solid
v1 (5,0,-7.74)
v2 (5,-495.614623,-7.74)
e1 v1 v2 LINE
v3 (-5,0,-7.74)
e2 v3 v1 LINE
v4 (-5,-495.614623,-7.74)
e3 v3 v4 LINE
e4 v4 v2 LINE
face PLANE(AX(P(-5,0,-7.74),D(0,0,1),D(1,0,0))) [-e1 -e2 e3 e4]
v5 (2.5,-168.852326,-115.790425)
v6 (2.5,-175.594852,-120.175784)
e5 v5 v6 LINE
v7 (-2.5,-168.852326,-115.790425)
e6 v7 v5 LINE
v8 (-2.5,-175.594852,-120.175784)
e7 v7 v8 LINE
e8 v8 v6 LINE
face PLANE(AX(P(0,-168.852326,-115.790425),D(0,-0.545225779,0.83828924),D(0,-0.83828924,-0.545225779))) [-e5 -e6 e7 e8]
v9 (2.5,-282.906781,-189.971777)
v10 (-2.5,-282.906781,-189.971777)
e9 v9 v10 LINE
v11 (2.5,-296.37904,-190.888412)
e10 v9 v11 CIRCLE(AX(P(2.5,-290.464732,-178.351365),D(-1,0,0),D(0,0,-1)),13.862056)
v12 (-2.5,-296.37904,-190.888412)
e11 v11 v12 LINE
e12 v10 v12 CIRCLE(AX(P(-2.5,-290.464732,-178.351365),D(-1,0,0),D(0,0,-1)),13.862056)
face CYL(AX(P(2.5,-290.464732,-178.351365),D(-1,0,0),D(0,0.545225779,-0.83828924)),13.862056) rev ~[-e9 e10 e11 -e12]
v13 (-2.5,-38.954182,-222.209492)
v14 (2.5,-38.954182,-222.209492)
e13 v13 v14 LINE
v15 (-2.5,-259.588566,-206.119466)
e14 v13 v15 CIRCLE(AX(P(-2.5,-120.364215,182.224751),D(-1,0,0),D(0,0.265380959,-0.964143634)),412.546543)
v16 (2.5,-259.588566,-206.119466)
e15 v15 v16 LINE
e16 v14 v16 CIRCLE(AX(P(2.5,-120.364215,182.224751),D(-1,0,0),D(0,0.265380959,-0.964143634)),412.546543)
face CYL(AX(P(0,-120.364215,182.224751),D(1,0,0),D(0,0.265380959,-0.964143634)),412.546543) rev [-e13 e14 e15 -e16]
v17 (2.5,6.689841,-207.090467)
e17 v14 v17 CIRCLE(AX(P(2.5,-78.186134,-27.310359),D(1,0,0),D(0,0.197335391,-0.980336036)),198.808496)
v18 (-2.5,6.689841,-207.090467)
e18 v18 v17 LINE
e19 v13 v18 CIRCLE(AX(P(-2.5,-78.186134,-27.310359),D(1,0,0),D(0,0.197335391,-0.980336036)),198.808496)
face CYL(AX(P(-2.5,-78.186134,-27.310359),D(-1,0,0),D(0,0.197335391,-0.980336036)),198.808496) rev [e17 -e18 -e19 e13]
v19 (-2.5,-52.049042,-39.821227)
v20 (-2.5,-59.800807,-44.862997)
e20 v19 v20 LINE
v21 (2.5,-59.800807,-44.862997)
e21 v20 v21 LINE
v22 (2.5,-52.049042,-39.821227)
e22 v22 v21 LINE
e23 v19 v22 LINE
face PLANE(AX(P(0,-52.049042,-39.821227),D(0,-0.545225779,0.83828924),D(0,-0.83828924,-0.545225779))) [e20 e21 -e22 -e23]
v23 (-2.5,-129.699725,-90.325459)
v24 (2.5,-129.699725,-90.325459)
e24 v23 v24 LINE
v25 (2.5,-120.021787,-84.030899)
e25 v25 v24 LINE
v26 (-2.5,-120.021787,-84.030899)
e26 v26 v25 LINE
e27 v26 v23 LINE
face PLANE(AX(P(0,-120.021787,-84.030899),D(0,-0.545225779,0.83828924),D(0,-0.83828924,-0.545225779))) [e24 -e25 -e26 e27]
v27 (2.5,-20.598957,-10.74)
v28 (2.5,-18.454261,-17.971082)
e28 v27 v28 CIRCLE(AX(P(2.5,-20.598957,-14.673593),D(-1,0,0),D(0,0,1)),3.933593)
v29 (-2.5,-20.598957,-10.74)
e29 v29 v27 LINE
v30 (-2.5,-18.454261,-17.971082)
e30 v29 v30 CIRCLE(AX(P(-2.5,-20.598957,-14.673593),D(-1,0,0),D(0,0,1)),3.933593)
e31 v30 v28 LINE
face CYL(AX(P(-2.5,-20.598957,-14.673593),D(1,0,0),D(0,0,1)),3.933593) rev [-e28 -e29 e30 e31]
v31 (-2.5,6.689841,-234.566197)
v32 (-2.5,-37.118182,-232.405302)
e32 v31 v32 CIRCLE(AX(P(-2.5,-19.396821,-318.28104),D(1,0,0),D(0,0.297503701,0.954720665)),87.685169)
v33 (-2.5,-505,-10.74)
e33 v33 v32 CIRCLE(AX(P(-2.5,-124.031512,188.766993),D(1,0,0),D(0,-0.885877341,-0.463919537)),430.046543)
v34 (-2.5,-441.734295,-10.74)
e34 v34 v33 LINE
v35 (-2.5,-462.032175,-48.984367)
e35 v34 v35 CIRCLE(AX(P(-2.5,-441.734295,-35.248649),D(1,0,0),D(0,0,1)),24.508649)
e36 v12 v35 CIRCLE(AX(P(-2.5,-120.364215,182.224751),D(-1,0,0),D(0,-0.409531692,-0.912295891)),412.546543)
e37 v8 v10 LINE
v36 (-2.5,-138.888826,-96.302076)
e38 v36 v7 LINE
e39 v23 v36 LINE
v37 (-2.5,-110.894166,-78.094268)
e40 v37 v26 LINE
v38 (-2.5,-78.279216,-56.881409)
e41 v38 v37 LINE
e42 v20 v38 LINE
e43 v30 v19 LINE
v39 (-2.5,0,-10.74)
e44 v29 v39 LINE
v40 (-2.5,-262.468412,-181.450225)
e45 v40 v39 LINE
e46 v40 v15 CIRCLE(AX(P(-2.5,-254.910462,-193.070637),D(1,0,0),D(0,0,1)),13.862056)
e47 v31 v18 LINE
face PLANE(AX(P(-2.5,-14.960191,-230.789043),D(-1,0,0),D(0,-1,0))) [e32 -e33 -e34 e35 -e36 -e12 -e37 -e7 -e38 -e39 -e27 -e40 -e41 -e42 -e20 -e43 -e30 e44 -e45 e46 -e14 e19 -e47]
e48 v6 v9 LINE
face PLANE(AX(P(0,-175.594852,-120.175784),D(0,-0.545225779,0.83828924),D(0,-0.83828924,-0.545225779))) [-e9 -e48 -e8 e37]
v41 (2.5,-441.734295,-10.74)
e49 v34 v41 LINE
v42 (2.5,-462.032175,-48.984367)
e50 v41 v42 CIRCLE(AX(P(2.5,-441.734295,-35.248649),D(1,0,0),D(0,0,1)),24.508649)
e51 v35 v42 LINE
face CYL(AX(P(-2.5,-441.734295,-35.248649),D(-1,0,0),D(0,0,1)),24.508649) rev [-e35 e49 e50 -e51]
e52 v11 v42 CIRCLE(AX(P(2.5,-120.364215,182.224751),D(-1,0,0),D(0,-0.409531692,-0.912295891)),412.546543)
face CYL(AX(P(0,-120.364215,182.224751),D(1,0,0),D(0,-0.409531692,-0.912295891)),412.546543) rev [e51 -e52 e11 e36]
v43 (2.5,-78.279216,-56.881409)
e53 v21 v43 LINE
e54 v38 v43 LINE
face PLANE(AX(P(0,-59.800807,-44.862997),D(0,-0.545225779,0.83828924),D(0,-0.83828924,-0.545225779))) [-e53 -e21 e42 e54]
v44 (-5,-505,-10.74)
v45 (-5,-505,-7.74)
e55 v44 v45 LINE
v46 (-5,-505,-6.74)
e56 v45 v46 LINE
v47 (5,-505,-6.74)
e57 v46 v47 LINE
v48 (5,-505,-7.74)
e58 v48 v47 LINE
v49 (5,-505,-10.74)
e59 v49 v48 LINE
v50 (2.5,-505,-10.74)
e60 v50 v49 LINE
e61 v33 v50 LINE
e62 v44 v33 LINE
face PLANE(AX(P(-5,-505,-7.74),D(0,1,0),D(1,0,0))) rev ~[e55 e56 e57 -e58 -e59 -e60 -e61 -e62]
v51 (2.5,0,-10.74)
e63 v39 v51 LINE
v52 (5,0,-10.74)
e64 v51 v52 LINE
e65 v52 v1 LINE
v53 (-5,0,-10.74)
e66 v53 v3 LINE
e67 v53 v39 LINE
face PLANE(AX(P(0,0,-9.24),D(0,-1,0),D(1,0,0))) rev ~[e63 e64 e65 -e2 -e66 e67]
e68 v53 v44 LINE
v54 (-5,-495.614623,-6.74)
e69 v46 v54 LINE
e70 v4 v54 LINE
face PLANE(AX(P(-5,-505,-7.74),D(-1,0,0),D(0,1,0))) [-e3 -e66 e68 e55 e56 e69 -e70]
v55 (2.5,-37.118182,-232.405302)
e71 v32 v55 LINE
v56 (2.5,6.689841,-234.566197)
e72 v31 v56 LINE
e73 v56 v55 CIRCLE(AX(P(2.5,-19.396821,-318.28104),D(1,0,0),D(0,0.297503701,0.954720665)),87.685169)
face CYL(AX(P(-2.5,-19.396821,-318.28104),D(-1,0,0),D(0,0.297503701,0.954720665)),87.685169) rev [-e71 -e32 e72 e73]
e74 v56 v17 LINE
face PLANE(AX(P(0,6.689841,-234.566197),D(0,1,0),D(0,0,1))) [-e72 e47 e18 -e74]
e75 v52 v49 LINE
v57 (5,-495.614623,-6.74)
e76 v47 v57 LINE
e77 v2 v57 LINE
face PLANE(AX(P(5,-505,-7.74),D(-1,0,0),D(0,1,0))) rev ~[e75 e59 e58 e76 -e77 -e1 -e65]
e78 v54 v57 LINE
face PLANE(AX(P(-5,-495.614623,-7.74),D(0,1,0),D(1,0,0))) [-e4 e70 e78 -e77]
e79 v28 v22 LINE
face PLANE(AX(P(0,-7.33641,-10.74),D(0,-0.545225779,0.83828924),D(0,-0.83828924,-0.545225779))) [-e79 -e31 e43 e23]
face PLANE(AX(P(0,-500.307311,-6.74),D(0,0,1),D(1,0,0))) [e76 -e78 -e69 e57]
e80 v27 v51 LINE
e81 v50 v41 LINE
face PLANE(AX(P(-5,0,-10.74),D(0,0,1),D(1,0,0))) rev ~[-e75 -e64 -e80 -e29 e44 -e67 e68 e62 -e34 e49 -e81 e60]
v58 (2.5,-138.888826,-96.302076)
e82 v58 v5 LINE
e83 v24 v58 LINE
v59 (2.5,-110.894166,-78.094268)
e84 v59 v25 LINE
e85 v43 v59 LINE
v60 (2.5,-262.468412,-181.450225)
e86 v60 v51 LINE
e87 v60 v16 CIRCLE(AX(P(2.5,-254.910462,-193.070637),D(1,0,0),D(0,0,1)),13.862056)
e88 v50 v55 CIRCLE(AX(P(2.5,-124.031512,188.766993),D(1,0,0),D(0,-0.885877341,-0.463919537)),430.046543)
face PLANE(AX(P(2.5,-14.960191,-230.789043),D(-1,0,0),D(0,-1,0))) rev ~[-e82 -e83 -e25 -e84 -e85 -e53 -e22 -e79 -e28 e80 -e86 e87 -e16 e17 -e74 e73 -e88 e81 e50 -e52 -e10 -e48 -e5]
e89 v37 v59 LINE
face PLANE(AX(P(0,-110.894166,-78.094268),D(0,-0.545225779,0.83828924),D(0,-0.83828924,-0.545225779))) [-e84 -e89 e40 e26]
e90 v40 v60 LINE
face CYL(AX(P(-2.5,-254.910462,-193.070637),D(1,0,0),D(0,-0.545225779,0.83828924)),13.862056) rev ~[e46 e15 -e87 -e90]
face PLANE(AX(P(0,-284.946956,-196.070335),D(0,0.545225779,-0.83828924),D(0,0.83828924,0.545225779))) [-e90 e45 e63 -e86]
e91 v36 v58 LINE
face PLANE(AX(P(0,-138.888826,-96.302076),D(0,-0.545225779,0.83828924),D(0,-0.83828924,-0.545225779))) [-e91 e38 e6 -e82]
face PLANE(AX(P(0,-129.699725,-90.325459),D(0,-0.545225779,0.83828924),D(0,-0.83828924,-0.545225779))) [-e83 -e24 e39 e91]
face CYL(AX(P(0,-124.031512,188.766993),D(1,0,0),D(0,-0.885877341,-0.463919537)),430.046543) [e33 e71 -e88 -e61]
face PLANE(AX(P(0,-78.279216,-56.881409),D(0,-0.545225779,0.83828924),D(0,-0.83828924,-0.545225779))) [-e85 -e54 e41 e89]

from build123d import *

# Parameters (mm, degrees)
F0_W        = 10
F0_H        = 3
F1_DEPTH    = 505
F3_DEPTH    = 2.5
F4_W        = 10
F4_H        = 9.3853771687
F5_DEPTH    = 1
F6_R        = 13.8620559507
F7_T1_DEPTH = 5
F8_T1_DEPTH = 5
F9_T1_DEPTH = 5
F10_R       = 3.9335934118


# Not quite as in the source:
# - a fillet or chamfer that OpenCascade refuses, or shapes differently, is made with other operations: its cross-section is extruded or revolved along the edge and cut away or added


with BuildPart() as f1:
    # F0 (on Front) → F1 (new body)
    with BuildSketch(Plane.XZ):
        with Locations((0, -9.24)):
            Rectangle(F0_W, F0_H)
    extrude(amount=F1_DEPTH)

    # F2 (on Right) → F3 (join, symmetric)
    with BuildSketch(Plane.YZ):
        with BuildLine():
            Line((-485, -10.74), (-505, -10.74))
            ThreePointArc((-505, -10.74), (-493.7857076195, -12.9341617837), (-482.5908295993, -15.2253199277))
            ThreePointArc((-482.5908295993, -15.2253199277), (-483.8023342329, -12.9863765535), (-485, -10.74))
        make_face()
        with BuildLine():
            ThreePointArc((-482.5908295993, -15.2253199277), (-493.7857076195, -12.9341617837), (-505, -10.74))
            ThreePointArc((-505, -10.74), (-295.8735946629, -205.4541731306), (-10.8822178841, -226.1272906733))
            Line((-10.8822178841, -226.1272906733), (-10.8822178841, -215.5293727716))
            ThreePointArc((-10.8822178841, -215.5293727716), (-149.5821295238, -229.2858372659), (-284.9469559253, -196.0703351995))
            ThreePointArc((-284.9469559253, -196.0703351995), (-287.1338212994, -195.111371401), (-289.3150994302, -194.1397657983))
            ThreePointArc((-289.3150994302, -194.1397657983), (-400.6140653387, -120.5204756417), (-482.5908295993, -15.2253199277))
        make_face()
        with BuildLine():
            Line((-175.5948523726, -120.1757838434), (-289.3150994302, -194.1397657983))
            ThreePointArc((-289.3150994302, -194.1397657983), (-287.1338212994, -195.111371401), (-284.9469559253, -196.0703351995))
            Line((-284.9469559253, -196.0703351995), (-164.6339868931, -117.8184275517))
            Line((-164.6339868931, -117.8184275517), (0, -10.74))
            Line((0, -10.74), (-7.3364102674, -10.74))
            Line((-7.3364102674, -10.74), (-52.0490416838, -39.8212265081))
            Line((-52.0490416838, -39.8212265081), (-59.8008067738, -44.8629972399))
            Line((-59.8008067738, -44.8629972399), (-69.1519232492, -50.9449907999))
            Line((-69.1519232492, -50.9449907999), (-78.2792164974, -56.881409077))
            Line((-78.2792164974, -56.881409077), (-110.8941655597, -78.0942675285))
            Line((-110.8941655597, -78.0942675285), (-120.0217871415, -84.0308993547))
            Line((-120.0217871415, -84.0308993547), (-129.6997254261, -90.3254587772))
            Line((-129.6997254261, -90.3254587772), (-138.8888255597, -96.3020764336))
            Line((-138.8888255597, -96.3020764336), (-168.8523264487, -115.7904252229))
            Line((-168.8523264487, -115.7904252229), (-175.5948523726, -120.1757838434))
        make_face()
        Polygon((-10.8822178841, -215.5293727716), (-10.8822178841, -226.1272906733), (6.6898409277, -234.5661967993), (6.6898409277, -207.0904666456), align=None)
    extrude(amount=F3_DEPTH, both=True)

    # F4 (on face) → F5 (join)
    with BuildSketch(Plane.XY.offset(-7.74)):
        with Locations((0, -500.3073114157)):
            Rectangle(F4_W, F4_H)
    extrude(amount=F5_DEPTH)

    # F6
    f6_edges = [f1.edges().sort_by_distance(p)[0] for p in [
        (0, -284.946956, -196.070335),
        (0, -289.315099, -194.139766),
    ]]
    fillet(f6_edges, radius=F6_R)

    # F7: fillet of radius 24.5086487231 on 1 edges, made by hand

    # F7_s2 → F7_t1 (join)
    with BuildSketch(Plane.YZ.offset(-2.5)):
        with BuildLine():
            ThreePointArc((-441.73429524, -10.74), (-463.3828258275, -23.7588712825), (-462.0321746683, -48.9843668676))
            ThreePointArc((-462.0321746683, -48.9843668676), (-474.0334147231, -30.1728667078), (-485, -10.74))
            Line((-485, -10.74), (-441.73429524, -10.74))
        make_face()
    extrude(amount=F7_T1_DEPTH)

    # F8: fillet of radius 198.8084962623 on 1 edges, made by hand

    # F8_s2 → F8_t1 (join)
    with BuildSketch(Plane.YZ.offset(-2.5)):
        with BuildLine():
            ThreePointArc((-38.9541818345, -222.2094923529), (-15.6734102854, -216.0349668625), (6.6898409277, -207.0904666456))
            Line((6.6898409277, -207.0904666456), (-10.8822178841, -215.5293727716))
            ThreePointArc((-10.8822178841, -215.5293727716), (-24.8597763304, -219.11494661), (-38.9541818345, -222.2094923529))
        make_face()
    extrude(amount=F8_T1_DEPTH)

    # F9: fillet of radius 87.6851690928 on 1 edges, made by hand

    # F9_s2 → F9_t1 (join)
    with BuildSketch(Plane.YZ.offset(-2.5)):
        with BuildLine():
            ThreePointArc((6.6898409277, -234.5661967993), (-15.0768754349, -230.7023497098), (-37.1181822791, -232.4053024821))
            ThreePointArc((-37.1181822791, -232.4053024821), (-23.9509608314, -229.4720686048), (-10.8822178841, -226.1272906733))
            Line((-10.8822178841, -226.1272906733), (6.6898409277, -234.5661967993))
        make_face()
    extrude(amount=F9_T1_DEPTH)

    # F10
    f10_edges = [f1.edges().sort_by_distance(p)[0] for p in [
        (0, -7.33641, -10.74),
    ]]
    fillet(f10_edges, radius=F10_R)


solid = f1.part
